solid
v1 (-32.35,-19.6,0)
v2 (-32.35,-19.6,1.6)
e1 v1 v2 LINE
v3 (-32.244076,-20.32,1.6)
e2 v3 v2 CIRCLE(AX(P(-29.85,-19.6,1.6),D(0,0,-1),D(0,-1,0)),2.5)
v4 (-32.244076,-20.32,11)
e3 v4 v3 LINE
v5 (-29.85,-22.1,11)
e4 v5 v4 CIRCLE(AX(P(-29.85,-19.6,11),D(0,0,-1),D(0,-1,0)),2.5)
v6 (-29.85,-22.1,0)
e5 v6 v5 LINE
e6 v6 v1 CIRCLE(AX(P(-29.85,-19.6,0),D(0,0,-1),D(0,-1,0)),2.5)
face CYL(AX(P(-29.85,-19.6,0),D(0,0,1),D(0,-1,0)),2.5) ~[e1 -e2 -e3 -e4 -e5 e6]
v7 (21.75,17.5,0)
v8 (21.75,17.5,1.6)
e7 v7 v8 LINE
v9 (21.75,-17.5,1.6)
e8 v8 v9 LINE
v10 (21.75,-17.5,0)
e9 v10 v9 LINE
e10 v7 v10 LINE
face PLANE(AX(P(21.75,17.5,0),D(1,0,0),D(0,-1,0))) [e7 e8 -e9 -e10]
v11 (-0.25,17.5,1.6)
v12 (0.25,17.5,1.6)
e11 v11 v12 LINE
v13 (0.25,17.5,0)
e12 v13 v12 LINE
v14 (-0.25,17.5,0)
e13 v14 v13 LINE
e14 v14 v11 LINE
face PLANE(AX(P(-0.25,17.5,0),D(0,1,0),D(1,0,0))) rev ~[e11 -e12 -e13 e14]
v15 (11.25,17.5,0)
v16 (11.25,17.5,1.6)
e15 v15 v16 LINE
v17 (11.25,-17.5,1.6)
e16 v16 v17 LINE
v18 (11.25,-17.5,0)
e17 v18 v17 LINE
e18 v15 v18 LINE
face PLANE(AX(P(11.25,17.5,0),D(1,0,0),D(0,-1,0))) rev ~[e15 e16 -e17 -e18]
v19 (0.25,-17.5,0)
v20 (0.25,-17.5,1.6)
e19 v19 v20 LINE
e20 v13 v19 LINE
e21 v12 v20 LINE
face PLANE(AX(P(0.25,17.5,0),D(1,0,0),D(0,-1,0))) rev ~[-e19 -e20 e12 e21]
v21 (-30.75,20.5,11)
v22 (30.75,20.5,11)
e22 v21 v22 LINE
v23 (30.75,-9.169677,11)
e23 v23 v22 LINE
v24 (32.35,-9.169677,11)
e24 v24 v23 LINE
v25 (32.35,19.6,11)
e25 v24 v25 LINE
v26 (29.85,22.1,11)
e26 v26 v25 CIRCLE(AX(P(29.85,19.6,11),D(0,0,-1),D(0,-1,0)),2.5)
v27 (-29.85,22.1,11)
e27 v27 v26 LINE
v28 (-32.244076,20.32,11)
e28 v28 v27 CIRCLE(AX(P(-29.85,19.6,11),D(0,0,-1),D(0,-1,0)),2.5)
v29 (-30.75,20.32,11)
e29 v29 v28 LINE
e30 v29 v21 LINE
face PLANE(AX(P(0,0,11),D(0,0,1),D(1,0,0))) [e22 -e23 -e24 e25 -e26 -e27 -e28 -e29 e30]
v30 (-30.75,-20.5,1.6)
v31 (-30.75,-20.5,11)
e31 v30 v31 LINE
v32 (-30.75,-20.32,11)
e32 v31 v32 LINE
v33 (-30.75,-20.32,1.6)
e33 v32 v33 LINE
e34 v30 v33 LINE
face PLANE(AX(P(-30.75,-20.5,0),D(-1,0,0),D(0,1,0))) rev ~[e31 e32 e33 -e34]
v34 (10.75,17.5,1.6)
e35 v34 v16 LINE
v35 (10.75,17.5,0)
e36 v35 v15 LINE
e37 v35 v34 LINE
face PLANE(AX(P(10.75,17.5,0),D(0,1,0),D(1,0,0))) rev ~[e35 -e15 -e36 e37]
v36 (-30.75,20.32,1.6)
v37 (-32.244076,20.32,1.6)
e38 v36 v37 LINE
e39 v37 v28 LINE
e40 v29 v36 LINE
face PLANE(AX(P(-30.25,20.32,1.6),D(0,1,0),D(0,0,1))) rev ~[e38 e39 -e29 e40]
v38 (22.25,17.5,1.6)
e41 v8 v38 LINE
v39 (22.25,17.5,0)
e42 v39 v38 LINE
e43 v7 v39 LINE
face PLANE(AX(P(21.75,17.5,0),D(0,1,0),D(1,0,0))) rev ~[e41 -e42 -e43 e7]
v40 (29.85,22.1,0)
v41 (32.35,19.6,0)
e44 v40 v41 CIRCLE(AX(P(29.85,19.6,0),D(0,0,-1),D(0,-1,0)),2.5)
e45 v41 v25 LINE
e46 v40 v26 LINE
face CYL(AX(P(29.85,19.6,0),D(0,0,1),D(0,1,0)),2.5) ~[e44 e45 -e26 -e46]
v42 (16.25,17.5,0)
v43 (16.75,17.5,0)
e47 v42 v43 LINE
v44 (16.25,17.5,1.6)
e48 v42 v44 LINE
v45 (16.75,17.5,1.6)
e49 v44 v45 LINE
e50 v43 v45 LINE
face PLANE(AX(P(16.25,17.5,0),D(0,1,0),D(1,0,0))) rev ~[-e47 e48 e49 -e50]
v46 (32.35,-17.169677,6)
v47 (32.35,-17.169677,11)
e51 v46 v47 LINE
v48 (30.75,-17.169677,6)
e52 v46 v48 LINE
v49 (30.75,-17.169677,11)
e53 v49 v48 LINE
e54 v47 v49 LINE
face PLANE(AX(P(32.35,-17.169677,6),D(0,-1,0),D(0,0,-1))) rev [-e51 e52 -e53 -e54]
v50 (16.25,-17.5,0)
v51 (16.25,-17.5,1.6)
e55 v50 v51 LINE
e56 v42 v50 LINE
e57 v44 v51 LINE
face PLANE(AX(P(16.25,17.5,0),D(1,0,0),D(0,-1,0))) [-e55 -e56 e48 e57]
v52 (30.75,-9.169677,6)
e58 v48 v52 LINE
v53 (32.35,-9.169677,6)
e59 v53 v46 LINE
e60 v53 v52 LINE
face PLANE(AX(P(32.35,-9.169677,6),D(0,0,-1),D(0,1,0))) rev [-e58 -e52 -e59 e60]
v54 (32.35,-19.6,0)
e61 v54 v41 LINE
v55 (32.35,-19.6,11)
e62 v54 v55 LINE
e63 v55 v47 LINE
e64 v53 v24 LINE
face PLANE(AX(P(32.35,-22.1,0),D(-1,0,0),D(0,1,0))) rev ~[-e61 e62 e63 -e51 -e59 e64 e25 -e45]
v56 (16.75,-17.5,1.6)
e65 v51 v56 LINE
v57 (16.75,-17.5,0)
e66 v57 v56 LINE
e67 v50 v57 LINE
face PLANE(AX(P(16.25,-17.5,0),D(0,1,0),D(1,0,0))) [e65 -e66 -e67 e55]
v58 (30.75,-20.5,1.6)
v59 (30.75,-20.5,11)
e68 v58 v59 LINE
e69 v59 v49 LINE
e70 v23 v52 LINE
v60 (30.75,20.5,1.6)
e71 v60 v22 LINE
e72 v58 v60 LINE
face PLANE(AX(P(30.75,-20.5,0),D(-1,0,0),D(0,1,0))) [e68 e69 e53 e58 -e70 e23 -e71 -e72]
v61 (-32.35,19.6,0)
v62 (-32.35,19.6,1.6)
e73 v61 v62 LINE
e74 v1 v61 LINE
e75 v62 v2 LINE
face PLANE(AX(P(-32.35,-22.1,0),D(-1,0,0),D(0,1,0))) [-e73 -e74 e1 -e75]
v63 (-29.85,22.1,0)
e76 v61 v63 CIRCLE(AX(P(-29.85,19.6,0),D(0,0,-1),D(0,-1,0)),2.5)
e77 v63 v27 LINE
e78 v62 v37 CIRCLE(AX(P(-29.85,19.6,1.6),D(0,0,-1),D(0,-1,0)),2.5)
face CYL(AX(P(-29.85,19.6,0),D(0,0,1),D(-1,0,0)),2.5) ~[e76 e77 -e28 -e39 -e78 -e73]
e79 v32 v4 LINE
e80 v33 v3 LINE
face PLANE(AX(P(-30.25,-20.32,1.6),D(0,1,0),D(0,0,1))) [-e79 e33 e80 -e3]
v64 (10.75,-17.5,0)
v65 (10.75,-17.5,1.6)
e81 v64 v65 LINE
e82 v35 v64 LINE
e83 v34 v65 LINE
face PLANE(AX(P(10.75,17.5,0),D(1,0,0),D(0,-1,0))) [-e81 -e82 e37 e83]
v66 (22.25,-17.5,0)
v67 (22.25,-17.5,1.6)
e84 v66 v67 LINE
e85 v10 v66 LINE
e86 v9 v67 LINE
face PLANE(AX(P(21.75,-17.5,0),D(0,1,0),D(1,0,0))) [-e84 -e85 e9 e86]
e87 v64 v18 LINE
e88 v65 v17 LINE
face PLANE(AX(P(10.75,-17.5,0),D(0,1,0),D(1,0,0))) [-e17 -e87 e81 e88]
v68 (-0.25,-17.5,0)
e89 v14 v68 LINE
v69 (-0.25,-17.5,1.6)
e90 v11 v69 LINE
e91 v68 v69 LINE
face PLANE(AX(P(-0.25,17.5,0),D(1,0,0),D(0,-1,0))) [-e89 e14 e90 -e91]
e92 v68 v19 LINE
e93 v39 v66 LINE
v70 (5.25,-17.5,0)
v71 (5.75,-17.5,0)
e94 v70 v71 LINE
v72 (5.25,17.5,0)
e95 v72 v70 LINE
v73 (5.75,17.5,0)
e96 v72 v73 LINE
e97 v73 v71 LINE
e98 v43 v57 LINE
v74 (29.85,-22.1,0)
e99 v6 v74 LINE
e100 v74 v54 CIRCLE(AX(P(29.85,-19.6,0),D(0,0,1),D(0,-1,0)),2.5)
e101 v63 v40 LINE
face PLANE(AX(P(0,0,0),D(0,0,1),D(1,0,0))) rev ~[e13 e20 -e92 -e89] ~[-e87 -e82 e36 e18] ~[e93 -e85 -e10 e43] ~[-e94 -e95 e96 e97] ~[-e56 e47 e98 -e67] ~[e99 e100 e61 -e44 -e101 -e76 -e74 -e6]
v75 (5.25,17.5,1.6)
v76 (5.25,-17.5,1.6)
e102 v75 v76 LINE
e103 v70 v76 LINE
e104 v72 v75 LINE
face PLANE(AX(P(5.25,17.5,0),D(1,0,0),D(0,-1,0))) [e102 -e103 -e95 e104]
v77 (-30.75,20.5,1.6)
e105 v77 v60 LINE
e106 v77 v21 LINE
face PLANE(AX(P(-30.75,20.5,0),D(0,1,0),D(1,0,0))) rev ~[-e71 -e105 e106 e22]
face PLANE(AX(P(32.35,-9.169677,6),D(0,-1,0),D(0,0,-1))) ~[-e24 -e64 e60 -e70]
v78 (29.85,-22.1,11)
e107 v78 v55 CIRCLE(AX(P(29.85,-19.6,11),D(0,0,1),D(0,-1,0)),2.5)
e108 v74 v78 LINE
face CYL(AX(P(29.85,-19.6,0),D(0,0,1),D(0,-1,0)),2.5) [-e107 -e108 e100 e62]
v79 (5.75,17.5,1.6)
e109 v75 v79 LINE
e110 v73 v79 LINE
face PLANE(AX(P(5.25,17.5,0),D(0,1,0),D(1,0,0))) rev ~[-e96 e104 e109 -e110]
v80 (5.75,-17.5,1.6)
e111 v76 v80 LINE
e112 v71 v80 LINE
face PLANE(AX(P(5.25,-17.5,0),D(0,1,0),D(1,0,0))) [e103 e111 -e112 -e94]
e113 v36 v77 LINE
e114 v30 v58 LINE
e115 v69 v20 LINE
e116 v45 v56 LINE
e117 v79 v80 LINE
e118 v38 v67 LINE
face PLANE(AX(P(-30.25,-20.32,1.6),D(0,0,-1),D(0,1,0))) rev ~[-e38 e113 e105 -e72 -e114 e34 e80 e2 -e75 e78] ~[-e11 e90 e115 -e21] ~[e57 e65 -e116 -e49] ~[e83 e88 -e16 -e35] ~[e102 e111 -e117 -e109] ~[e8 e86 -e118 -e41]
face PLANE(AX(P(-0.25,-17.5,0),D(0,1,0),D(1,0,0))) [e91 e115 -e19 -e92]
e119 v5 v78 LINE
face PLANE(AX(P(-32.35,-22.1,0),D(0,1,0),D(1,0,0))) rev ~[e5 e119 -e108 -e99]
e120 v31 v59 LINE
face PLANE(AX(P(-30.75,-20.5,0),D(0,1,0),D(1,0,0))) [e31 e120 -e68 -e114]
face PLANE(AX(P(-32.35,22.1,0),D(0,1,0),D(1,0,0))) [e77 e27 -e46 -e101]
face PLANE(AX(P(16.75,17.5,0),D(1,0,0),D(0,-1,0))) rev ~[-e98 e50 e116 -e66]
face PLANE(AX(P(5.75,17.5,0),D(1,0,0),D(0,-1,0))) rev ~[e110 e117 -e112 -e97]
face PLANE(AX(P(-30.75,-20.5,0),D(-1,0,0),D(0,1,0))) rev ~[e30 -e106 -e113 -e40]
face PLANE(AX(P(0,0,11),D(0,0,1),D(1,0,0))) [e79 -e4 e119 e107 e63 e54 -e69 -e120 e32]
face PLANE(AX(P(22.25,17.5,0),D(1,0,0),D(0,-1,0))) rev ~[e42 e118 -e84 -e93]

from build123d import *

# Parameters (mm, degrees)
F0_W      = 60.5
F0_H      = 40.64
F1_DEPTH  = 12.7
F2_W      = 64.6999999881
F2_H      = 44.1999999881
F2_W_2    = 61.5
F2_H_2    = 41
F3_DEPTH  = 11
F4_DEPTH  = 1.6
F5_DEPTH  = 8.8
F6_W      = 0.5
F6_H      = 35
F7_DEPTH  = 16
F8_DEPTH  = 60.7
F9_R      = 2.5
F10_R     = 2.5
F11_W     = 8
F11_H     = 5
F12_DEPTH = 1.71


# Not quite as in the source:
# - a feature names something its author has since deleted; it is built from what else it names


with BuildPart() as f1:
    # F0 (on Top) → F1 (new body)
    with BuildSketch(Plane.XY):
        Rectangle(F0_W, F0_H)
    extrude(amount=F1_DEPTH)



with BuildPart() as f3:
    # F2 (on Top) → F3 (new body)
    with BuildSketch(Plane.XY):
        Rectangle(F2_W, F2_H)
        Rectangle(F2_W_2, F2_H_2, mode=Mode.SUBTRACT)
    extrude(amount=F3_DEPTH)


with BuildPart() as f1_1:
    add(f1.part)

    add(f3.part)  # F4 merges F3
    # F2 (on Top) → F4 (join)
    with BuildSketch(Plane.XY):
        Rectangle(F2_W_2, F2_H_2)
    extrude(amount=F4_DEPTH)

    # F5 (cut): a face of the model
    f5_faces = [f1_1.faces().sort_by_distance(p)[0] for p in [
        (-30.25, 0, 7.15),
    ]]
    extrude(f5_faces, amount=F5_DEPTH, mode=Mode.SUBTRACT)

    # F6 (on face) → F7 (cut)
    with BuildSketch(Plane(origin=(0, 0, 0), x_dir=(1, 0, 0), z_dir=(0, 0, -1))):
        with Locations((22, 0)):
            Rectangle(F6_W, F6_H)
        with Locations((16.5, 0)):
            Rectangle(F6_W, F6_H)
        with Locations((11, 0)):
            Rectangle(F6_W, F6_H)
        with Locations((5.5, 0)):
            Rectangle(F6_W, F6_H)
        Rectangle(F6_W, F6_H)
    extrude(amount=-F7_DEPTH, mode=Mode.SUBTRACT)

    # F8 (cut): a face of the model
    f8_faces = [f1_1.faces().sort_by_distance(p)[0] for p in [
        (-30.25, 0, 7.15),
    ]]
    extrude(f8_faces, amount=-F8_DEPTH, mode=Mode.SUBTRACT)

    # F9
    f9_edges = [f1_1.edges().sort_by_distance(p)[0] for p in [
        (32.35, 22.1, 5.5),
        (32.35, -22.1, 5.5),
    ]]
    fillet(f9_edges, radius=F9_R)

    # F10
    f10_edges = [f1_1.edges().sort_by_distance(p)[0] for p in [
        (-32.35, 22.1, 5.5),
        (-32.35, -22.1, 5.5),
    ]]
    fillet(f10_edges, radius=F10_R)

    # F14: F12 across plane


with BuildPart() as f12:
    # F11 (on face) → F12 (new body)
    with BuildSketch(Plane.YZ.offset(32.349999994)):
        with Locations((13.1696772724, 8.5)):
            Rectangle(F11_W, F11_H)
    extrude(amount=-F12_DEPTH)


with BuildPart() as f1_2:
    add(f1_1.part)
    add(f12.part.mirror(Plane(origin=(0, 0, 5.5), x_dir=(-1, 0, 0), z_dir=(0, 1, 0))), mode=Mode.SUBTRACT)


solid = f1_2.part
